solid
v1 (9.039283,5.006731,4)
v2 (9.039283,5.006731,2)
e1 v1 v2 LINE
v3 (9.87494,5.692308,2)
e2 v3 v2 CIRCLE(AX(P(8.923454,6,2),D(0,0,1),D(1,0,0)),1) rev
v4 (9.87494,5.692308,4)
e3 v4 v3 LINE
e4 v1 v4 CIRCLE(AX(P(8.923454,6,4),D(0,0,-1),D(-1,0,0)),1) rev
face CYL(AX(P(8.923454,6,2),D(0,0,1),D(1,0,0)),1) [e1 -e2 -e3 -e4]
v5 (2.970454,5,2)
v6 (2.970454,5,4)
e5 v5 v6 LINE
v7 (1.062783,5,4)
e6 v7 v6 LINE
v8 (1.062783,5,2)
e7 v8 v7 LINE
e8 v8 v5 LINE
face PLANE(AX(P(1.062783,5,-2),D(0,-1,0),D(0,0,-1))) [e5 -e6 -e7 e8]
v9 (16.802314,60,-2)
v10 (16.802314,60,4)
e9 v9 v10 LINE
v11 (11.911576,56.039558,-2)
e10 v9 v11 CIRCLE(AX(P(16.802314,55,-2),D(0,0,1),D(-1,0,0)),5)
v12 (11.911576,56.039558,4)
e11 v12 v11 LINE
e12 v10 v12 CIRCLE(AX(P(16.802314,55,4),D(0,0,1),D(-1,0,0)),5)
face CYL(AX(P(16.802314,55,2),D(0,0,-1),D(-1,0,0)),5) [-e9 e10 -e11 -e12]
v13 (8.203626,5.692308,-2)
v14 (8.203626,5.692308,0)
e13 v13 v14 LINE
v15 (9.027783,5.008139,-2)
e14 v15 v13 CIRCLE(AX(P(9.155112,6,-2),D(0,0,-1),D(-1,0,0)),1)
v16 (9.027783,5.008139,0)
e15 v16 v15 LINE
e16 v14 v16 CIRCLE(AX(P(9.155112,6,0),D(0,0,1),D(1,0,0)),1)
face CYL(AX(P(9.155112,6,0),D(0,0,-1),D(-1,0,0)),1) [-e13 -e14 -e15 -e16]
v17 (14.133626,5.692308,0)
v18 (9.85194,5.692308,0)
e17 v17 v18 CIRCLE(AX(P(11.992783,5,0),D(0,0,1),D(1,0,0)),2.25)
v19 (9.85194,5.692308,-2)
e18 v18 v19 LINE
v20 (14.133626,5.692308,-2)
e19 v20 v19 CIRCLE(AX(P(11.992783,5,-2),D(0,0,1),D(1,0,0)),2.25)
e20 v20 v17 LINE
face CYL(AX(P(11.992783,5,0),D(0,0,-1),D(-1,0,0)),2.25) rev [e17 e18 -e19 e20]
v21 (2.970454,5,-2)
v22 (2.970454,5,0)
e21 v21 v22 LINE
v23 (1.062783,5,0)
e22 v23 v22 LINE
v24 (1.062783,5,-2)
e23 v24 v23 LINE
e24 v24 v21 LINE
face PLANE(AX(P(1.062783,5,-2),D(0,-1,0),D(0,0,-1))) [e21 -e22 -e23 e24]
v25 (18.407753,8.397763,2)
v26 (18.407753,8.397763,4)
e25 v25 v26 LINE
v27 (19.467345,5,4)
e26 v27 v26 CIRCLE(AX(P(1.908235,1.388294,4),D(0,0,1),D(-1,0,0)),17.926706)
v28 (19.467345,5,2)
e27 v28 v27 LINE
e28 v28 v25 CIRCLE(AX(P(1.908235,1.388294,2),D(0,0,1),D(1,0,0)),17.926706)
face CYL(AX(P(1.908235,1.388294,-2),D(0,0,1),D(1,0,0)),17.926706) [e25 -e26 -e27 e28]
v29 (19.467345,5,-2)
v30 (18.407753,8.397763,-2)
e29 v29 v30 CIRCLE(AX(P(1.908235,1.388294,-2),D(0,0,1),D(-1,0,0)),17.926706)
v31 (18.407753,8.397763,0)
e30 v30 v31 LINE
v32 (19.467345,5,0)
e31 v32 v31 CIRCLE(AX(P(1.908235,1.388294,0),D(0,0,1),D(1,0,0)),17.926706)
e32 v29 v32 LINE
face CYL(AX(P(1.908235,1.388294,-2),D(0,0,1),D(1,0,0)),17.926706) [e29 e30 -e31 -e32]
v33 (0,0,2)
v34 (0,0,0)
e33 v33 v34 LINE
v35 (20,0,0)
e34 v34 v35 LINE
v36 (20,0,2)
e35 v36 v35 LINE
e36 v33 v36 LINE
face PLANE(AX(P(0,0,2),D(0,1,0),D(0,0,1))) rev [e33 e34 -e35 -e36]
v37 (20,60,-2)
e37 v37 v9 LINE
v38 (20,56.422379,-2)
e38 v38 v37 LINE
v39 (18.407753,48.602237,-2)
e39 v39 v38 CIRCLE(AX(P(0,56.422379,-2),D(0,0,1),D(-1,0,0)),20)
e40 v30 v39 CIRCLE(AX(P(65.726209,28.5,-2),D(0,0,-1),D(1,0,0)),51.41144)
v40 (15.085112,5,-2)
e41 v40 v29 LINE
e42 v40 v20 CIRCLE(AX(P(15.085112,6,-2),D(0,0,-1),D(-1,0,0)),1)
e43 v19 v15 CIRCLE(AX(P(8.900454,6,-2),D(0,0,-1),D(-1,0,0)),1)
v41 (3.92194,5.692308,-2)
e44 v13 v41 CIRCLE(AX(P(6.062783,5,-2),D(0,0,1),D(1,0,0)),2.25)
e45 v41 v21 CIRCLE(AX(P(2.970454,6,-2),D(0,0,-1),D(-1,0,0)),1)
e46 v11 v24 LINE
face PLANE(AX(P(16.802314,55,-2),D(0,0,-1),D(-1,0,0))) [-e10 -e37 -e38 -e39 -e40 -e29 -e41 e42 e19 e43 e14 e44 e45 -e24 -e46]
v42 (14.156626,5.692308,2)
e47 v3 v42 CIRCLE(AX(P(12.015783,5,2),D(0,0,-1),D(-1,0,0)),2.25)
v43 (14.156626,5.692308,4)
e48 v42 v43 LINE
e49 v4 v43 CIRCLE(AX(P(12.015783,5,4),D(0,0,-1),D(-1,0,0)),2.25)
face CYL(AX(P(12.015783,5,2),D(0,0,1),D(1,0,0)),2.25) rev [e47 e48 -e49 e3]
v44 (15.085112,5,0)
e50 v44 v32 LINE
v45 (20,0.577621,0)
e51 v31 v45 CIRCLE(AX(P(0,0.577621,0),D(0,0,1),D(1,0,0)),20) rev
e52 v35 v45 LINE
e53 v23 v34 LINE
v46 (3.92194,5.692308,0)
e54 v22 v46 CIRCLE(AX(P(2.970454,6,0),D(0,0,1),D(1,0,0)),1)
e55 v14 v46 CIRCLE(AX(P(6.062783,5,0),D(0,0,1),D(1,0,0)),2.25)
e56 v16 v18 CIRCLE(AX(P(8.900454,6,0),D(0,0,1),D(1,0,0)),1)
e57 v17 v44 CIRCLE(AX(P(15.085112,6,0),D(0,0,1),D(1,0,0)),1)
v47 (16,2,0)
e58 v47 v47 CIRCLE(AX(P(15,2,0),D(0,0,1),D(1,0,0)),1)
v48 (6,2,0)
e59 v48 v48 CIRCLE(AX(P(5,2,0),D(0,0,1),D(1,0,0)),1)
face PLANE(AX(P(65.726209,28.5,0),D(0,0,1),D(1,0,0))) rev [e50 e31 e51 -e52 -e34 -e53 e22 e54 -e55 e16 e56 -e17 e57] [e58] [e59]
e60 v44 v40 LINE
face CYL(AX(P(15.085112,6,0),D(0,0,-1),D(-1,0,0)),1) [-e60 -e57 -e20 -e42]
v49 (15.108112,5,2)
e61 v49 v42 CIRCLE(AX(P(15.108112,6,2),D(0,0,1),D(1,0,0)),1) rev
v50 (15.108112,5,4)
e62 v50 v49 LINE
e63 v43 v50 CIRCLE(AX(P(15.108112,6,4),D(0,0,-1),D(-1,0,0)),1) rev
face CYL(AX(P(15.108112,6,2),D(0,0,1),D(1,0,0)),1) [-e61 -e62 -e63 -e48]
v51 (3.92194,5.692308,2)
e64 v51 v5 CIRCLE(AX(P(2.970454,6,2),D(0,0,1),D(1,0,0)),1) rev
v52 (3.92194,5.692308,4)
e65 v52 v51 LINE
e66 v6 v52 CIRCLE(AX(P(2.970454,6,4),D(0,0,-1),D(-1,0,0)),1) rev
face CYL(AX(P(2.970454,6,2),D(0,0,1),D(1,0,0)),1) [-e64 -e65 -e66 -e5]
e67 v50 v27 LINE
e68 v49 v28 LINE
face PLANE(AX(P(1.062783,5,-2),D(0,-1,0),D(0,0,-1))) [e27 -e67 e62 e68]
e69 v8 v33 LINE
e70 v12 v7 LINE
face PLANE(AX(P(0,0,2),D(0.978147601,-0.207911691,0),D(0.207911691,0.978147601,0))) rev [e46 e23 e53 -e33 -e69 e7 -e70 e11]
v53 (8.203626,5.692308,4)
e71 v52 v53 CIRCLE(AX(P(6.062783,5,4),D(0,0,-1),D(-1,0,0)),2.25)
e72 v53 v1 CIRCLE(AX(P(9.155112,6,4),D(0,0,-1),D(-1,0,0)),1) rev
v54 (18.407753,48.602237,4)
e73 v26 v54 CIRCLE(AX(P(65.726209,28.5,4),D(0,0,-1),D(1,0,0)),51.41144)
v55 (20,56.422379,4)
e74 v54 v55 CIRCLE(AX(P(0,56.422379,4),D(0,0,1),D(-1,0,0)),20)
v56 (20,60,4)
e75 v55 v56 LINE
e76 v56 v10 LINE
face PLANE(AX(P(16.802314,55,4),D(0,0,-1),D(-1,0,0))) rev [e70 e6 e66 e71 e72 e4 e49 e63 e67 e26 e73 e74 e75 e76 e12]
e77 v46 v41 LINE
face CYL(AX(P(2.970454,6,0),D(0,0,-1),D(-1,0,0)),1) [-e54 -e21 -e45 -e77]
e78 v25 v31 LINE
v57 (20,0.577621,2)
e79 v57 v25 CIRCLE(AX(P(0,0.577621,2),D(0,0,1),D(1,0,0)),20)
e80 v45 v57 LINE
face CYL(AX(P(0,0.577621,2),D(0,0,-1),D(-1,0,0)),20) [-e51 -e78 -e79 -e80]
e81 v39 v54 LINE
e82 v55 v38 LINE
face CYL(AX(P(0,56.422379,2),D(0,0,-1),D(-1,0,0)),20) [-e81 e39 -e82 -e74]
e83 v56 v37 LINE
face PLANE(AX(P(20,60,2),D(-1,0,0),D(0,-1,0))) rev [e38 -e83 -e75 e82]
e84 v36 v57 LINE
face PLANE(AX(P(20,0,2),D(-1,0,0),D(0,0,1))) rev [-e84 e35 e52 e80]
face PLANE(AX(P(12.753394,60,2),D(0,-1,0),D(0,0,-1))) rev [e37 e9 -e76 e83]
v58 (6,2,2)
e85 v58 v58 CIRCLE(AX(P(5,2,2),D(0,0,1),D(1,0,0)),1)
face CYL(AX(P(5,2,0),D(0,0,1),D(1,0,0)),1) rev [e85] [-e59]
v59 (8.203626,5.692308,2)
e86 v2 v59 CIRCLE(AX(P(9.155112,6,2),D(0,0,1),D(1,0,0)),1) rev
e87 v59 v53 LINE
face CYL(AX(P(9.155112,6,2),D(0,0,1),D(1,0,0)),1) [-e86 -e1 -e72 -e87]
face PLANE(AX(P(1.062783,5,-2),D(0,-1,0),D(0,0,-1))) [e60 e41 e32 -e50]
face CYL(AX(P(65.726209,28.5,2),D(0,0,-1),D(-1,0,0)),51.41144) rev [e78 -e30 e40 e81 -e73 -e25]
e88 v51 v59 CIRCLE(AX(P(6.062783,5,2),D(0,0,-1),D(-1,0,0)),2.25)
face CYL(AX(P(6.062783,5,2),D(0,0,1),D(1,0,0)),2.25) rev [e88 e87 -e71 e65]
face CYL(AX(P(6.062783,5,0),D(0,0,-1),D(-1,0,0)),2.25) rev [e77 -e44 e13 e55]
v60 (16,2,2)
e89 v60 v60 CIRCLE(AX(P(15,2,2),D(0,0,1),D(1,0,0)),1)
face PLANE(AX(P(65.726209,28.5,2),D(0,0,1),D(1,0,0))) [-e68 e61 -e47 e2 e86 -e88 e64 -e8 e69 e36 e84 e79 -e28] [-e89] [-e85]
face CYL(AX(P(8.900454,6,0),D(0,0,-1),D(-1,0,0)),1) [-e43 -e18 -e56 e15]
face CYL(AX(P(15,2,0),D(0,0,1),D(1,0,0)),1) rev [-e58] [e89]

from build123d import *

# Parameters (mm, degrees)
SALIENTE_EXTRUIR1_DEPTH      = 2
REDONDEO1_R                  = 5
REDONDEO2_R                  = 20
REDONDEO3_R                  = 20
CROQUIS3_R                   = 1
CORTAR_EXTRUIR1_DEPTH        = 2
SALIENTE_EXTRUIR2_DEPTH      = 2
SALIENTE_EXTRUIR2_DEPTH_BACK = 4
CORTAR_EXTRUIR2_DEPTH        = 2
REDONDEO4_R                  = 1
CORTAR_EXTRUIR3_START        = -2
CORTAR_EXTRUIR3_DEPTH        = 2
REDONDEO5_R                  = 1


with BuildPart() as part:
    # Croquis1 → Saliente-Extruir1 (new body)
    with BuildSketch(Plane.XY):
        with BuildLine():
            Line((0, 0), (20, 0))
            Line((20, 0), (20, 5))
            ThreePointArc((20, 5), (14.314768742, 28.5), (20, 52))
            Line((20, 52), (20, 60))
            Line((20, 60), (12.7533937, 60))
            Line((12.7533937, 60), (0, 0))
        make_face()
    extrude(amount=SALIENTE_EXTRUIR1_DEPTH)

    # Redondeo1
    redondeo1_edges = [part.edges().sort_by_distance(p)[0] for p in [
        (12.7533937, 60, 1),
    ]]
    fillet(redondeo1_edges, radius=REDONDEO1_R)

    # Redondeo2
    redondeo2_edges = [part.edges().sort_by_distance(p)[0] for p in [
        (20, 52, 1),
    ]]
    fillet(redondeo2_edges, radius=REDONDEO2_R)

    # Redondeo3
    redondeo3_edges = [part.edges().sort_by_distance(p)[0] for p in [
        (20, 5, 1),
    ]]
    fillet(redondeo3_edges, radius=REDONDEO3_R)

    # Croquis3 → Cortar-Extruir1 (cut)
    with BuildSketch(Plane.XY.offset(2)):
        with Locations((5, 2)):
            Circle(CROQUIS3_R)
        with Locations((15, 2)):
            Circle(CROQUIS3_R)
    extrude(amount=-CORTAR_EXTRUIR1_DEPTH, mode=Mode.SUBTRACT)

    # Croquis4 → Saliente-Extruir2 (add, two sides: drawn at the far end of the back side and taken through both)
    with BuildSketch(Plane.XY.offset(2).offset(-SALIENTE_EXTRUIR2_DEPTH_BACK)):
        with BuildLine():
            Line((1.062782808, 5), (19.467344823, 5))
            ThreePointArc((19.467344823, 5), (19.022081332, 6.725242685), (18.407753369, 8.397762657))
            ThreePointArc((18.407753369, 8.397762657), (14.314768742, 28.5), (18.407753369, 48.602237343))
            ThreePointArc((18.407753369, 48.602237343), (19.597896155, 52.432082505), (20, 56.422379023))
            Line((20, 56.422379023), (20, 60))
            Line((20, 60), (16.802313866, 60))
            ThreePointArc((16.802313866, 60), (13.655711911, 58.885729807), (11.911575863, 56.039558454))
            Line((11.911575863, 56.039558454), (1.062782808, 5))
        make_face()
    extrude(amount=SALIENTE_EXTRUIR2_DEPTH + SALIENTE_EXTRUIR2_DEPTH_BACK)

    # Croquis5 → Cortar-Extruir2 (cut)
    with BuildSketch(Plane.XY.offset(4)):
        with BuildLine():
            Line((3.812782808, 5), (8.312782808, 5))
            ThreePointArc((8.312782808, 5), (6.062782808, 7.25), (3.812782808, 5))
        make_face()
        with BuildLine():
            Line((9.765782808, 5), (14.265782808, 5))
            ThreePointArc((14.265782808, 5), (12.015782808, 7.25), (9.765782808, 5))
        make_face()
    extrude(amount=-CORTAR_EXTRUIR2_DEPTH, mode=Mode.SUBTRACT)

    # Redondeo4
    # the kernel refuses this fillet: 1 mm, written as the material it takes off along each edge
    with BuildSketch(Plane(origin=(8.312782808, 5, 6.105823048), x_dir=(1, 0, 0), z_dir=(0, 0, -1)), Plane(origin=(14.265782808, 5, 6.105823048), x_dir=(1, 0, 0), z_dir=(0, 0, -1))) as redondeo4_piece_1:
        with BuildLine():
            CenterArc((0.842329219, -1), REDONDEO4_R, 90, 72.079786861)
            ThreePointArc((-0.109156694, -0.692307692), (-0.0274567, -0.350430137), (0, 0))
            Line((0, 0), (0.842329219, 0))
        make_face()
    extrude(amount=4.105823048, mode=Mode.SUBTRACT)
    with BuildSketch(Plane(origin=(3.812782808, 5, 6.105823048), x_dir=(-1, 0, 0), z_dir=(0, 0, -1))) as redondeo4_piece_2:
        with BuildLine():
            CenterArc((0.842329219, 1), REDONDEO4_R, 197.920213139, 72.079786861)
            ThreePointArc((-0.109156694, 0.692307692), (-0.0274567, 0.350430137), (0, 0))
            Line((0, 0), (0.842329219, 0))
        make_face()
    extrude(amount=4.105823048, mode=Mode.SUBTRACT)
    with BuildSketch(Plane(origin=(9.765782808, 5, 6.105823048), x_dir=(0.15574672772788725, 0.9877970220657962, 0), z_dir=(0, 0, -1))) as redondeo4_piece_3:
        with BuildLine():
            CenterArc((0.856607003, -0.987797022), REDONDEO4_R, 98.96010657, 72.079786861)
            Line((-0.13119002, -0.832050294), (0, 0))
            ThreePointArc((0, 0), (0.350430137, -0.0274567), (0.700860275, 0))
        make_face()
    extrude(amount=4.105823048, mode=Mode.SUBTRACT)

    # Croquis6 → Cortar-Extruir3 (cut)
    with BuildSketch(Plane(origin=(0, 0, -2), x_dir=(-1, 0, 0), z_dir=(0, 0, -1)).offset(CORTAR_EXTRUIR3_START)):
        with BuildLine():
            Line((-8.312782808, 5), (-3.812782808, 5))
            ThreePointArc((-3.812782808, 5), (-6.062782808, 7.25), (-8.312782808, 5))
        make_face()
        with BuildLine():
            Line((-14.242782808, 5), (-9.742782808, 5))
            ThreePointArc((-9.742782808, 5), (-11.992782808, 7.25), (-14.242782808, 5))
        make_face()
    extrude(amount=CORTAR_EXTRUIR3_DEPTH, mode=Mode.SUBTRACT)

    # Redondeo5
    # the kernel refuses this fillet: 1 mm, written as the material it takes off along each edge
    with BuildSketch(Plane(origin=(3.812782808, 5, 2.105823048), x_dir=(-1, 0, 0), z_dir=(0, 0, -1))) as redondeo5_piece_1_section:
        with BuildLine():
            CenterArc((0.842329219, 1), REDONDEO5_R, 197.920213139, 72.079786861)
            ThreePointArc((-0.109156694, 0.692307692), (-0.0274567, 0.350430137), (0, 0))
            Line((0, 0), (0.842329219, 0))
        make_face()
    redondeo5_piece_1 = extrude(amount=6.211646096, mode=Mode.PRIVATE)
    redondeo5_piece_1 = split(redondeo5_piece_1, bisect_by=Plane(origin=(3.627238075, 5.153542941, 2), z_dir=(0, 0, 1)), keep=Keep.TOP, mode=Mode.PRIVATE)
    add(redondeo5_piece_1, mode=Mode.SUBTRACT)
    with BuildSketch(Plane(origin=(3.812782808, 5, 0), x_dir=(-1, 0, 0), z_dir=(0, 0, -1)), Plane(origin=(9.742782808, 5, 0), x_dir=(-1, 0, 0), z_dir=(0, 0, -1))) as redondeo5_piece_2:
        with BuildLine():
            CenterArc((0.842329219, 1), REDONDEO5_R, 197.920213139, 72.079786861)
            ThreePointArc((-0.109156694, 0.692307692), (-0.0274567, 0.350430137), (0, 0))
            Line((0, 0), (0.842329219, 0))
        make_face()
    extrude(amount=4.105823048, mode=Mode.SUBTRACT)
    with BuildSketch(Plane(origin=(8.312782808, 5, 2.105823048), x_dir=(1, 0, 0), z_dir=(0, 0, -1))) as redondeo5_piece_3_section:
        with BuildLine():
            CenterArc((0.842329219, -1), REDONDEO5_R, 90, 72.079786861)
            ThreePointArc((-0.109156694, -0.692307692), (-0.0274567, -0.350430137), (0, 0))
            Line((0, 0), (0.842329219, 0))
        make_face()
    redondeo5_piece_3 = extrude(amount=6.211646096, mode=Mode.PRIVATE)
    redondeo5_piece_3 = split(redondeo5_piece_3, bisect_by=Plane(origin=(8.498327542, 5.153542941, 2), z_dir=(0, 0, 1)), keep=Keep.TOP, mode=Mode.PRIVATE)
    add(redondeo5_piece_3, mode=Mode.SUBTRACT)
    with BuildSketch(Plane(origin=(8.312782808, 5, 0), x_dir=(1, 0, 0), z_dir=(0, 0, -1)), Plane(origin=(14.242782808, 5, 0), x_dir=(1, 0, 0), z_dir=(0, 0, -1))) as redondeo5_piece_4:
        with BuildLine():
            CenterArc((0.842329219, -1), REDONDEO5_R, 90, 72.079786861)
            ThreePointArc((-0.109156694, -0.692307692), (-0.0274567, -0.350430137), (0, 0))
            Line((0, 0), (0.842329219, 0))
        make_face()
    extrude(amount=4.105823048, mode=Mode.SUBTRACT)


solid = part.part
